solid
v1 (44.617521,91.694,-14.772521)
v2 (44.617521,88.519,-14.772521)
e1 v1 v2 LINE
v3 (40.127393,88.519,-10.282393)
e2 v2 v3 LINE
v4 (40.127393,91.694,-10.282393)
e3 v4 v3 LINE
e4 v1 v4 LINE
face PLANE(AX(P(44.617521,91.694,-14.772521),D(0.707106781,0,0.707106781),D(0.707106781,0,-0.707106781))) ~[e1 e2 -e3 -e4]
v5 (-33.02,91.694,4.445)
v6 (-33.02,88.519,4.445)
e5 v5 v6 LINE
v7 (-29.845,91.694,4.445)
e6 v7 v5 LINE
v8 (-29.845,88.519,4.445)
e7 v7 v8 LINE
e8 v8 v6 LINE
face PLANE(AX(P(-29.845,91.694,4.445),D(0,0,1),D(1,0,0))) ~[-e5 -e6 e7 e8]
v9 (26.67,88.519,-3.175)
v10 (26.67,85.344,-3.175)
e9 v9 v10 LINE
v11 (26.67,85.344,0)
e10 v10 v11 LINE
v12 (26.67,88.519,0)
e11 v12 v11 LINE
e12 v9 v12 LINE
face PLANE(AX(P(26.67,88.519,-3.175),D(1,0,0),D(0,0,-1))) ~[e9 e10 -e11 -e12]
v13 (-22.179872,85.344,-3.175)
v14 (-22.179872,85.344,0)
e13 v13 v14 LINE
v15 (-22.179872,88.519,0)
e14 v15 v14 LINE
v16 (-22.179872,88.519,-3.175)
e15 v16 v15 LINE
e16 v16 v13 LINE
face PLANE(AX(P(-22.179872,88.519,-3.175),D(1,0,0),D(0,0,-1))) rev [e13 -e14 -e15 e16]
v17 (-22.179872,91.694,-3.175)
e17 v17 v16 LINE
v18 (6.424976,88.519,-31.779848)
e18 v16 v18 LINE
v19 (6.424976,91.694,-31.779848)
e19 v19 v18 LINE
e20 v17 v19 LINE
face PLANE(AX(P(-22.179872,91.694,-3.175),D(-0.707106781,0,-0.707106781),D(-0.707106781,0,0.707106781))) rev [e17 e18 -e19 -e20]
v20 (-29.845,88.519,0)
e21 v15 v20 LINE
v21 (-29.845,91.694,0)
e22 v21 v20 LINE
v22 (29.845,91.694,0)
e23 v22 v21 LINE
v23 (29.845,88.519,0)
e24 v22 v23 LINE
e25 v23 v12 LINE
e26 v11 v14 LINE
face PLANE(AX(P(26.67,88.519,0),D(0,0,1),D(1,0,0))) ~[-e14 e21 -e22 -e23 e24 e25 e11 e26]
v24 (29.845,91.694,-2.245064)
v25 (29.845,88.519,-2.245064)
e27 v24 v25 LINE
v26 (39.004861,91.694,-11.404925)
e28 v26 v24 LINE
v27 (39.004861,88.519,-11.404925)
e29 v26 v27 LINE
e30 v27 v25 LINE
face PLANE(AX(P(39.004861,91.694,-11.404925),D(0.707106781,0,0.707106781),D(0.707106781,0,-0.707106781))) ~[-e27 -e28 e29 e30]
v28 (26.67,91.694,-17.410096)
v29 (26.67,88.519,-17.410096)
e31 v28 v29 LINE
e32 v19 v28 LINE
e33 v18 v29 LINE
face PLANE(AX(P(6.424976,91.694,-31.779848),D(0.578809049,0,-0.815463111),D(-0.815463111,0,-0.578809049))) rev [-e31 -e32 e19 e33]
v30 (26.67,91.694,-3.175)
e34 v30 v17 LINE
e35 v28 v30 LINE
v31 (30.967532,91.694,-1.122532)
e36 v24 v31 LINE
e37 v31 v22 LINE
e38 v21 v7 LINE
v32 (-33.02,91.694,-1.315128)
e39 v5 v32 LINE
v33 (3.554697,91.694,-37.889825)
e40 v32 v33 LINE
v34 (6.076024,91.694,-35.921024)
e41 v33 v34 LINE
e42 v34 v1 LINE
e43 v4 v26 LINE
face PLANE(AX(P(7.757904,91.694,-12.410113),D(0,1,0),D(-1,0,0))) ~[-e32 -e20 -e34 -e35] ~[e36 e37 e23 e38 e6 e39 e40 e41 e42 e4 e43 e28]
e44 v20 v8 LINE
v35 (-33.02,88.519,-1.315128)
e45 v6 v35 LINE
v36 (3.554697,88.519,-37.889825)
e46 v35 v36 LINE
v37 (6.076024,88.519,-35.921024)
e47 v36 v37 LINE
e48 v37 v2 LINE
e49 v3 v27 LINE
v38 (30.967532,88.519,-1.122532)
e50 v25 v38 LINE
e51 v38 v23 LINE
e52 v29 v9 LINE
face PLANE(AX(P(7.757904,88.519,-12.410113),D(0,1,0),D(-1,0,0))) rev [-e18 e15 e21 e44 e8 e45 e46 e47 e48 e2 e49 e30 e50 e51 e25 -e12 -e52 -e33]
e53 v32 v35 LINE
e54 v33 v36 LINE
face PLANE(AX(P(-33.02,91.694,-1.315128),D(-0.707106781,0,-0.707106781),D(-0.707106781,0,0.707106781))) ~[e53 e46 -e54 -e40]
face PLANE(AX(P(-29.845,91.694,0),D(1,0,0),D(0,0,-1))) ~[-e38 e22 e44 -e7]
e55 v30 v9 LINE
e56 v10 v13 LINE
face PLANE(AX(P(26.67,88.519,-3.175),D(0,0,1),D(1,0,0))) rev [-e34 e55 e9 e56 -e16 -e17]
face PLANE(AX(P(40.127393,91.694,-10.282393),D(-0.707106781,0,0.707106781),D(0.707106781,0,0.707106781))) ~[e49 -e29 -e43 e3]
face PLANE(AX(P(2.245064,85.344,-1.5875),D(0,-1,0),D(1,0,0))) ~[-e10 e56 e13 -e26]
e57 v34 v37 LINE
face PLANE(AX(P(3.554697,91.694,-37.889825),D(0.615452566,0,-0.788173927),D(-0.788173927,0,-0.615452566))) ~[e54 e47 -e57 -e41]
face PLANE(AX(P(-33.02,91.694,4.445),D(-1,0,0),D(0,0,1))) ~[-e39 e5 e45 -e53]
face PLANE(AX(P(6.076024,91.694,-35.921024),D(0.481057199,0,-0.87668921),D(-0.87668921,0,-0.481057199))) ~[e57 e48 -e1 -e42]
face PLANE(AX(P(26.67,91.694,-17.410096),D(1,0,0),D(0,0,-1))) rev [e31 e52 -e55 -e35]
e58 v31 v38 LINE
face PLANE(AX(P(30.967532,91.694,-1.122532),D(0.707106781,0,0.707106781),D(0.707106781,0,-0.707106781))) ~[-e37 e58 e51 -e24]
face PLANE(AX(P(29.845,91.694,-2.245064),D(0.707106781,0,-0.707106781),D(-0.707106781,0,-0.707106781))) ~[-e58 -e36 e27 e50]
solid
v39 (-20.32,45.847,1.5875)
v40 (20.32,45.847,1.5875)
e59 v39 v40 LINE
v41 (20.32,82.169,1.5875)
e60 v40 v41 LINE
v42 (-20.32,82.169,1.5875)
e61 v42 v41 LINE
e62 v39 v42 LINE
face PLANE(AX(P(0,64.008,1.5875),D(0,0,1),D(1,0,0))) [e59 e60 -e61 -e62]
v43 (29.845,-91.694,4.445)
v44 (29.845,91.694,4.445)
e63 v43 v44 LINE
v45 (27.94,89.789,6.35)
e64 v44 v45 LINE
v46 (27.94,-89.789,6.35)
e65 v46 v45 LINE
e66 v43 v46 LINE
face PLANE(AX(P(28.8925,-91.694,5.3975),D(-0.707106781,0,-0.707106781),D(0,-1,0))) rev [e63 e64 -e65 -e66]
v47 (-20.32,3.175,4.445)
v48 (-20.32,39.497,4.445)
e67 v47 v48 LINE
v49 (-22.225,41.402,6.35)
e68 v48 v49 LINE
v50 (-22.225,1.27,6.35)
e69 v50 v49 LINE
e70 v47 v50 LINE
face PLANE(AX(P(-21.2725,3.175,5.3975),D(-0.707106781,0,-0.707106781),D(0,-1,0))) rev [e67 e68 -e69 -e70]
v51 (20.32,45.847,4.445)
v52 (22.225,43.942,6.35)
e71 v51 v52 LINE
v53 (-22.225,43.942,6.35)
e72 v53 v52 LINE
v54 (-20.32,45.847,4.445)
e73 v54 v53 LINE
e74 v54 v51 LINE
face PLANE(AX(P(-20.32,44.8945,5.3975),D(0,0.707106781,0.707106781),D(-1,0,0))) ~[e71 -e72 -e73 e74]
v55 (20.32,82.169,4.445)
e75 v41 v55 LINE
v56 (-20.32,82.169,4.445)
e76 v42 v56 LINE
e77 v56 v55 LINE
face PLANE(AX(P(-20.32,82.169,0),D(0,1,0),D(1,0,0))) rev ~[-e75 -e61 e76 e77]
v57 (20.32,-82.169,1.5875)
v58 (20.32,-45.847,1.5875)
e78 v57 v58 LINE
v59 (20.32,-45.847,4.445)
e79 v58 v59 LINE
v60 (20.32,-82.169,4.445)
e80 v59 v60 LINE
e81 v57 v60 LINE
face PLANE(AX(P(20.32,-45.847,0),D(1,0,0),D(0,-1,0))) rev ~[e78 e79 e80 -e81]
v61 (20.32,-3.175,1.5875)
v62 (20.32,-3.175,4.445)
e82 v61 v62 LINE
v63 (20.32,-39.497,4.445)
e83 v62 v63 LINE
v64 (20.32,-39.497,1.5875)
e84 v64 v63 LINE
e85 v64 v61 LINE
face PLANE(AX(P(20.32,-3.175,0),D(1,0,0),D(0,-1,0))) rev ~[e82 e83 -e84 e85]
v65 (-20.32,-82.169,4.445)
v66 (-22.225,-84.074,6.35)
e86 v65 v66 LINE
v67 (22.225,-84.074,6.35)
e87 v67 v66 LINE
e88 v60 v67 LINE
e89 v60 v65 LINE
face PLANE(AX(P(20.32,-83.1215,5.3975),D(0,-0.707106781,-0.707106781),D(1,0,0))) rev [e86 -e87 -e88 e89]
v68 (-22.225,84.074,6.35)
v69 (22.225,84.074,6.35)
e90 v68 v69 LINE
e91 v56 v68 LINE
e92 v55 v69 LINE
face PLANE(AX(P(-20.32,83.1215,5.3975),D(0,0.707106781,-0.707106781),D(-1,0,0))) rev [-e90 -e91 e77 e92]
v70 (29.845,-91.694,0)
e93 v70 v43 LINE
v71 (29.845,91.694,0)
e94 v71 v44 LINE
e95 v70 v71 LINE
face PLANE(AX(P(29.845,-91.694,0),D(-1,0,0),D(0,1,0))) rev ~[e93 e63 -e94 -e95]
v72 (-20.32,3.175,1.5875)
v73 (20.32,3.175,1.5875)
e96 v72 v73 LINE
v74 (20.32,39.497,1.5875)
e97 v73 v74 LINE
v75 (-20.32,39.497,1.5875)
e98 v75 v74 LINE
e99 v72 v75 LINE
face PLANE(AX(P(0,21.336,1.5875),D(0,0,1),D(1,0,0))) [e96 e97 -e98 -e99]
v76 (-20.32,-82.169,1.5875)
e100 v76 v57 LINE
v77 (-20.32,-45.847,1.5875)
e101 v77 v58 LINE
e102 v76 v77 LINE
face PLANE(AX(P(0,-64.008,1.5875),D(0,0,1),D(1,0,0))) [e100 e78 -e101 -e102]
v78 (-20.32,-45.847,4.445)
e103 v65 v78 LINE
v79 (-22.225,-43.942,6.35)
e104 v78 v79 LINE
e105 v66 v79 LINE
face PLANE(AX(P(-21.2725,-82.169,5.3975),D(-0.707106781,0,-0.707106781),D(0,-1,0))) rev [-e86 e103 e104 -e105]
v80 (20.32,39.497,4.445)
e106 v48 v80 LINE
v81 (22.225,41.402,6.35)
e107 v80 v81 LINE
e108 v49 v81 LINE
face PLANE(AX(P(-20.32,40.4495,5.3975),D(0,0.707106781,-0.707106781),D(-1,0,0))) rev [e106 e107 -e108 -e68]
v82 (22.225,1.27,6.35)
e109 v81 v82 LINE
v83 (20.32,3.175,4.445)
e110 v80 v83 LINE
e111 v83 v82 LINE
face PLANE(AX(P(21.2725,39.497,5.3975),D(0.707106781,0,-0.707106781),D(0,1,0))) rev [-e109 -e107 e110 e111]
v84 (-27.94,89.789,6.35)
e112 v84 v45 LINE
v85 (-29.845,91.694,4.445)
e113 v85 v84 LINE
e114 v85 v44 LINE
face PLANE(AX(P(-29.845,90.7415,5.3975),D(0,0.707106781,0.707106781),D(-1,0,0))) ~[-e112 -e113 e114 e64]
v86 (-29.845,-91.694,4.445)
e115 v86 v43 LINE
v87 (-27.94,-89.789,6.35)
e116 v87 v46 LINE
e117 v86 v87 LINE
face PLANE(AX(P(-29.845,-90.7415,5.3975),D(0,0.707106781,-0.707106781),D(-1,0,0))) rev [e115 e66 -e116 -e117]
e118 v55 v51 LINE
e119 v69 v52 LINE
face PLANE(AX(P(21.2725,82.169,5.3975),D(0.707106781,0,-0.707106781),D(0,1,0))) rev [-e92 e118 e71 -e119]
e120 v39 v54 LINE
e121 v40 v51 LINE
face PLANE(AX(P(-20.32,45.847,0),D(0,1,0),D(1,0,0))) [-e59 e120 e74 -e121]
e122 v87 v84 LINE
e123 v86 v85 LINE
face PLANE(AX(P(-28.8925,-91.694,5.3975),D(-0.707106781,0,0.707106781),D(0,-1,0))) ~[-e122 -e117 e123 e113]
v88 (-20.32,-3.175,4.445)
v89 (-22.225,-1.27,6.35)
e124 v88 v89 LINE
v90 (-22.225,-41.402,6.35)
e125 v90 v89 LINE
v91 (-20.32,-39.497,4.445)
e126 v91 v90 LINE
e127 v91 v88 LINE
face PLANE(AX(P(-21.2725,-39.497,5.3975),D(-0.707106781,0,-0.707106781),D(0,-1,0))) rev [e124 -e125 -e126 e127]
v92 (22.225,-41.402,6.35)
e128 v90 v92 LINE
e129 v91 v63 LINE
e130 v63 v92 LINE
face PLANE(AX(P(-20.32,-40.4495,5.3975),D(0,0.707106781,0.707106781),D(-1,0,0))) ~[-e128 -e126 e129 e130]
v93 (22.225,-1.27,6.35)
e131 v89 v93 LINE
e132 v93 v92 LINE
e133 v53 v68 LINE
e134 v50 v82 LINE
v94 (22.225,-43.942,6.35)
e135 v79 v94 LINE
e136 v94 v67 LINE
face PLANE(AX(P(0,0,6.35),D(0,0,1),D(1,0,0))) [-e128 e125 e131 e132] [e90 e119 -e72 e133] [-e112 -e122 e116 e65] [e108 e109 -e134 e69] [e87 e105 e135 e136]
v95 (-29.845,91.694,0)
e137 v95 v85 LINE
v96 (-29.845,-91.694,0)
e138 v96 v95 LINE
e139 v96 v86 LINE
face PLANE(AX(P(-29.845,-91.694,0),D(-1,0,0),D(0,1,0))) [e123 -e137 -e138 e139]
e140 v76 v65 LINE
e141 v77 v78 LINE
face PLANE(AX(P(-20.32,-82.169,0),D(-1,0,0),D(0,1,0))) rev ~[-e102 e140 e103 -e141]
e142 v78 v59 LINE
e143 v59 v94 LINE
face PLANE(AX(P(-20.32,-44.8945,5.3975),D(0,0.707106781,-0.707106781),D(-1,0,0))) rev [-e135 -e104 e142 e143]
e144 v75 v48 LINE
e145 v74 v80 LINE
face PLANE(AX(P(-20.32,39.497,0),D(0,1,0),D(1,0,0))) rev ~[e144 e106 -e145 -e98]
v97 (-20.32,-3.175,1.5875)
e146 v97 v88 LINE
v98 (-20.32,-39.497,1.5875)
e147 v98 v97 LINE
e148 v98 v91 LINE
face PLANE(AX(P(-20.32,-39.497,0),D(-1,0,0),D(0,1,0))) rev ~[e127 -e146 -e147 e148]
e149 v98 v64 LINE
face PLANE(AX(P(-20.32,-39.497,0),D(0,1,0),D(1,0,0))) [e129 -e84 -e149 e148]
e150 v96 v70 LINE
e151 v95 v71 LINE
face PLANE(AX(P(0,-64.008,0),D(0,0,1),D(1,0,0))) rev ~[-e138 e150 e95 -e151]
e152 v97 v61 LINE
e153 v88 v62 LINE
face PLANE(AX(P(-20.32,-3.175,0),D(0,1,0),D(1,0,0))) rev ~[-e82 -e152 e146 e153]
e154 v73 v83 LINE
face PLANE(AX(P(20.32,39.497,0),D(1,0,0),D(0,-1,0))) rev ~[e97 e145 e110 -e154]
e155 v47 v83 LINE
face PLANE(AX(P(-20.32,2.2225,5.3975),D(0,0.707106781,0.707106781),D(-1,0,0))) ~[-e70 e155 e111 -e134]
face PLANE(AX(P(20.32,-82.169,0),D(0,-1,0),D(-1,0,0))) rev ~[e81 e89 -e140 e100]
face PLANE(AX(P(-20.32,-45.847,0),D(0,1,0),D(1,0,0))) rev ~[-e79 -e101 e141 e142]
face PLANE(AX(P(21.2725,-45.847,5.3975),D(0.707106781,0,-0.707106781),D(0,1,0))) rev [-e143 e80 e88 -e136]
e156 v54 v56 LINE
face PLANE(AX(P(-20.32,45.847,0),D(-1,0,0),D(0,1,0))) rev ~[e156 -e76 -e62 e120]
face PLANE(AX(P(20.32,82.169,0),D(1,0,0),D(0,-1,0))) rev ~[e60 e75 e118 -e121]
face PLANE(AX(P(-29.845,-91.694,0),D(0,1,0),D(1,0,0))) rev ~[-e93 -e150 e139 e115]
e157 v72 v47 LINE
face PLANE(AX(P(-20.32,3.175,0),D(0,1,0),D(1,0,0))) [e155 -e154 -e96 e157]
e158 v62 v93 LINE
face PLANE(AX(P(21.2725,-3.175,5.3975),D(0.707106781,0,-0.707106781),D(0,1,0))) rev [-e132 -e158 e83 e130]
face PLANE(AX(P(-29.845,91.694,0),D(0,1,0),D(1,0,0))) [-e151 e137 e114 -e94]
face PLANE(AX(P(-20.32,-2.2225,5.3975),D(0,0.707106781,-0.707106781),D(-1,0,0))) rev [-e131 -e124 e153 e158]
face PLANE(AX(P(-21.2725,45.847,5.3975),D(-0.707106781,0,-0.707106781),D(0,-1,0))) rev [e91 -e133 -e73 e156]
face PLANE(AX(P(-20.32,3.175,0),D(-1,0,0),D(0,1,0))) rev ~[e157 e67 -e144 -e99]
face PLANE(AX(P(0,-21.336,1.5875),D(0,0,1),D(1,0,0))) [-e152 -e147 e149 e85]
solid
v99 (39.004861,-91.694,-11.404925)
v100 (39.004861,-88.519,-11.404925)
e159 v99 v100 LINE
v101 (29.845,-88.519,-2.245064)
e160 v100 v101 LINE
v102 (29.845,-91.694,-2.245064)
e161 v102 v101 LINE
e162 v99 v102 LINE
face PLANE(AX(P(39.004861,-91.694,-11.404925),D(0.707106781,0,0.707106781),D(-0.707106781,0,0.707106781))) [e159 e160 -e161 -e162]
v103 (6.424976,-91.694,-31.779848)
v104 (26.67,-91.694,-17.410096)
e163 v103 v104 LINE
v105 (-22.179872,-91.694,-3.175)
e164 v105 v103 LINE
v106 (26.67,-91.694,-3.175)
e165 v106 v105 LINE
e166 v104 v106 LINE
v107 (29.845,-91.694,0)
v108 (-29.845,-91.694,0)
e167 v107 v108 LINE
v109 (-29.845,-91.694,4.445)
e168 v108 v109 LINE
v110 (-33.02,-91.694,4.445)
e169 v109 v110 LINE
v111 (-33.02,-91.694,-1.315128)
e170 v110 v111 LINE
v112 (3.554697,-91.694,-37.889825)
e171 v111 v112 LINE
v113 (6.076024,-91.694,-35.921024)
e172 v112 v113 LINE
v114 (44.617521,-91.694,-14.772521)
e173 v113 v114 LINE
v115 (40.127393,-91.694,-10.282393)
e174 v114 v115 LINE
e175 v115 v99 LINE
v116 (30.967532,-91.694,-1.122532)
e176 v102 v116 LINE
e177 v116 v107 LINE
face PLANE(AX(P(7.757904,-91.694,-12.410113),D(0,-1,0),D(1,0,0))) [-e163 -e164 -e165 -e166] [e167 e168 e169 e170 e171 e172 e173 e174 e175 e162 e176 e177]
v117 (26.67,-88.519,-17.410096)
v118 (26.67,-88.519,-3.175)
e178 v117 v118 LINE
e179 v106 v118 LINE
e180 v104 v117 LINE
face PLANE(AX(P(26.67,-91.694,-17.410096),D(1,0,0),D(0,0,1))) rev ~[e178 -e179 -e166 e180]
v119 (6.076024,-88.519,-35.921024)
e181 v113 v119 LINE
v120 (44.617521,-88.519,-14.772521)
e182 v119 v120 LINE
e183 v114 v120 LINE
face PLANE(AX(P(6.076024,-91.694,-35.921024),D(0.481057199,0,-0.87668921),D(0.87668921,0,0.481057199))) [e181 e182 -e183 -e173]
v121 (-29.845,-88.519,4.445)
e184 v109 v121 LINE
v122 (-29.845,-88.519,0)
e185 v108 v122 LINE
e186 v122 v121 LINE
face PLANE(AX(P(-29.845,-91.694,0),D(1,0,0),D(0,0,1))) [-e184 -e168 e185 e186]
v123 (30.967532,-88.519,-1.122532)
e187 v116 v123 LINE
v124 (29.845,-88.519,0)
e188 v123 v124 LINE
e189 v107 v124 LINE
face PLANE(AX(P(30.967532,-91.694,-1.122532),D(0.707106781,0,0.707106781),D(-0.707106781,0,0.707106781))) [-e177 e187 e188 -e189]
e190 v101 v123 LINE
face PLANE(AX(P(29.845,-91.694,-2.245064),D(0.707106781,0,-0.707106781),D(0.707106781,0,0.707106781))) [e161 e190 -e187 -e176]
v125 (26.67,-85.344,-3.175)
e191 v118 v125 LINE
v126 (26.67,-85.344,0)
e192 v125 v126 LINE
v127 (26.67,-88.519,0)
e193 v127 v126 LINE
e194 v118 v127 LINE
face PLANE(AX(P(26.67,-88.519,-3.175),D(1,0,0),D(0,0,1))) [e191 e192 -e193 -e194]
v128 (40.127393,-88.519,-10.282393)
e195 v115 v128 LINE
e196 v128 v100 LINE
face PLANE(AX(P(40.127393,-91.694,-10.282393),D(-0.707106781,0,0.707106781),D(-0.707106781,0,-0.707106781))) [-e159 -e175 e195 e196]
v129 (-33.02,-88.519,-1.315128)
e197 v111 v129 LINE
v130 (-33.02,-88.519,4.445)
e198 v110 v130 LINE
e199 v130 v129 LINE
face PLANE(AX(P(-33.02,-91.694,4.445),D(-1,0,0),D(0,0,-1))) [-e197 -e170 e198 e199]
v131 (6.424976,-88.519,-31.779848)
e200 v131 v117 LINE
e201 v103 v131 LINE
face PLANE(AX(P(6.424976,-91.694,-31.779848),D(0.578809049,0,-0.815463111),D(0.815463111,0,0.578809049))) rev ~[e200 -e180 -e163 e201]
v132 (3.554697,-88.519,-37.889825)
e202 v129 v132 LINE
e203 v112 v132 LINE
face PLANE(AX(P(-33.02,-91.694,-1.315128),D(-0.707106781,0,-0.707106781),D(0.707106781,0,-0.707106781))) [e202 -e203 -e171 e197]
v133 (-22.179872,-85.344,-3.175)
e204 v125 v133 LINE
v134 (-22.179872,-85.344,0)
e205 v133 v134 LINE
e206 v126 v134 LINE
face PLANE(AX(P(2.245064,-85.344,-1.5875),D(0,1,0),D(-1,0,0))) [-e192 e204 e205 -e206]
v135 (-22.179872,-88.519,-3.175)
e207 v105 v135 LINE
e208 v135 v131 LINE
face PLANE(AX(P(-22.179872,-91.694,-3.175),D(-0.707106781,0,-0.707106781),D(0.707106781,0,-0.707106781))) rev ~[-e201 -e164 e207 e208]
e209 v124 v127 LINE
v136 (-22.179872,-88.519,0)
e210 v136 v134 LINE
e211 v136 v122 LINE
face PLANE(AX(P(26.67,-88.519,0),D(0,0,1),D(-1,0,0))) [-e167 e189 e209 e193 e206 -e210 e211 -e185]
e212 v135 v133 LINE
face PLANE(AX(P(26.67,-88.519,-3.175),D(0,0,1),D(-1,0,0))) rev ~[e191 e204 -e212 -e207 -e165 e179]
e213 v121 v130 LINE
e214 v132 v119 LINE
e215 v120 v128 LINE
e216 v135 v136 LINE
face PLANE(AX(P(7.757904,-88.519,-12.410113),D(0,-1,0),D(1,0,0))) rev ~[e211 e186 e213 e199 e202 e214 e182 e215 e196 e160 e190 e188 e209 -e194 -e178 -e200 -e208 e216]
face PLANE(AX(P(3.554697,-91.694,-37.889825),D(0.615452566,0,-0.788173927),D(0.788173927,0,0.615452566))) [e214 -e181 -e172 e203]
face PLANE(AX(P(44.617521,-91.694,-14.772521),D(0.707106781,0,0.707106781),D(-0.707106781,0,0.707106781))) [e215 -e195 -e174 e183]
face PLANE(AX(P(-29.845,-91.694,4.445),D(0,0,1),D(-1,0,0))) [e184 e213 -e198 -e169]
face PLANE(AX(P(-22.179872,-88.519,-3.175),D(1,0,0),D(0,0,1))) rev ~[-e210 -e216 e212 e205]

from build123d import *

# Parameters (mm, degrees)
F0_W     = 59.69
F0_H     = 183.388
F0_W_2   = 40.64
F0_H_2   = 6.35
F1_DEPTH = 6.35
F2_SIZE  = 1.905
F0_H_3   = 36.322
F3_DEPTH = 1.5875
F5_DEPTH = 3.175
F7_DEPTH = 25.4
F8_W     = 48.8498719395
F8_H     = 3.175
F9_DEPTH = 3.175


with BuildPart() as f1:
    # F0 (on Top) → F1 (new body)
    with BuildSketch(Plane.XY):
        Rectangle(F0_W, F0_H)
        Polygon((20.32, -45.847), (20.32, -82.169), (-20.32, -82.169), (-20.32, -45.847), (-20.32, -39.497), (-20.32, -3.175), (-20.32, 3.175), (-20.32, 39.497), (-20.32, 45.847), (-20.32, 82.169), (20.32, 82.169), (20.32, 45.847), (20.32, 39.497), (20.32, 3.175), (20.32, -3.175), (20.32, -39.497), align=None, mode=Mode.SUBTRACT)
        Rectangle(F0_W_2, F0_H_2)
        with Locations((0, -42.672)):
            Rectangle(F0_W_2, F0_H_2)
        with Locations((0, 42.672)):
            Rectangle(F0_W_2, F0_H_2)
    extrude(amount=F1_DEPTH)

    # F2
    f2_edges = [f1.edges().sort_by_distance(p)[0] for p in [
        (-29.845, 0, 6.35),
        (0, -91.694, 6.35),
        (29.845, 0, 6.35),
        (0, 91.694, 6.35),
        (0, -82.169, 6.35),
        (-20.32, -64.008, 6.35),
        (0, -45.847, 6.35),
        (20.32, -64.008, 6.35),
        (-20.32, -21.336, 6.35),
        (0, -3.175, 6.35),
        (20.32, -21.336, 6.35),
        (0, -39.497, 6.35),
        (-20.32, 21.336, 6.35),
        (0, 39.497, 6.35),
        (20.32, 21.336, 6.35),
        (0, 3.175, 6.35),
        (-20.32, 64.008, 6.35),
        (0, 82.169, 6.35),
        (20.32, 64.008, 6.35),
        (0, 45.847, 6.35),
    ]]
    chamfer(f2_edges, length=F2_SIZE)

    # F0 (on Top) → F3 (join)
    with BuildSketch(Plane.XY):
        with Locations((0, -64.008)):
            Rectangle(F0_W_2, F0_H_3)
        with Locations((0, -21.336)):
            Rectangle(F0_W_2, F0_H_3)
        with Locations((0, 21.336)):
            Rectangle(F0_W_2, F0_H_3)
        with Locations((0, 64.008)):
            Rectangle(F0_W_2, F0_H_3)
    extrude(amount=F3_DEPTH)


with BuildPart() as f5:
    # F4 (on face) → F5 (new body)
    with BuildSketch(Plane.XZ.offset(91.694)):
        Polygon((29.845, 0), (20.32, 0), (-20.32, 0), (-29.845, 0), (6.0760244843, -35.9210244843), (44.6175213192, -14.7725213192), (40.1273932586, -10.2823932586), (39.0048612435, -11.4049252738), (29.845, -2.2450640303), (30.9675320151, -1.1225320151), align=None)
        Polygon((6.0760244843, -35.9210244843), (-29.845, 0), (-29.845, 4.445), (-33.02, 4.445), (-33.02, -1.3151280605), (3.5546971341, -37.8898251946), align=None)
    extrude(amount=-F5_DEPTH)

    # F6 (on face) → F7 (cut)
    with BuildSketch(Plane.XZ.offset(91.694)):
        Polygon((6.424976296, -31.7798482355), (26.67, -17.4100959351), (26.67, -3.175), (-22.1798719395, -3.175), align=None)
    extrude(amount=-F7_DEPTH, mode=Mode.SUBTRACT)

    # F8 (on face) → F9 (join)
    with BuildSketch(Plane(origin=(0, -88.519, 0), x_dir=(-1, 0, 0), z_dir=(0, 1, 0))):
        with Locations((-2.2450640303, -1.5875)):
            Rectangle(F8_W, F8_H)
    extrude(amount=F9_DEPTH)


with BuildPart() as f10_1:
    # F10: instance of F5
    add(f5.part.mirror(Plane.XZ))


solid = Compound([f1.part, f5.part, f10_1.part])
